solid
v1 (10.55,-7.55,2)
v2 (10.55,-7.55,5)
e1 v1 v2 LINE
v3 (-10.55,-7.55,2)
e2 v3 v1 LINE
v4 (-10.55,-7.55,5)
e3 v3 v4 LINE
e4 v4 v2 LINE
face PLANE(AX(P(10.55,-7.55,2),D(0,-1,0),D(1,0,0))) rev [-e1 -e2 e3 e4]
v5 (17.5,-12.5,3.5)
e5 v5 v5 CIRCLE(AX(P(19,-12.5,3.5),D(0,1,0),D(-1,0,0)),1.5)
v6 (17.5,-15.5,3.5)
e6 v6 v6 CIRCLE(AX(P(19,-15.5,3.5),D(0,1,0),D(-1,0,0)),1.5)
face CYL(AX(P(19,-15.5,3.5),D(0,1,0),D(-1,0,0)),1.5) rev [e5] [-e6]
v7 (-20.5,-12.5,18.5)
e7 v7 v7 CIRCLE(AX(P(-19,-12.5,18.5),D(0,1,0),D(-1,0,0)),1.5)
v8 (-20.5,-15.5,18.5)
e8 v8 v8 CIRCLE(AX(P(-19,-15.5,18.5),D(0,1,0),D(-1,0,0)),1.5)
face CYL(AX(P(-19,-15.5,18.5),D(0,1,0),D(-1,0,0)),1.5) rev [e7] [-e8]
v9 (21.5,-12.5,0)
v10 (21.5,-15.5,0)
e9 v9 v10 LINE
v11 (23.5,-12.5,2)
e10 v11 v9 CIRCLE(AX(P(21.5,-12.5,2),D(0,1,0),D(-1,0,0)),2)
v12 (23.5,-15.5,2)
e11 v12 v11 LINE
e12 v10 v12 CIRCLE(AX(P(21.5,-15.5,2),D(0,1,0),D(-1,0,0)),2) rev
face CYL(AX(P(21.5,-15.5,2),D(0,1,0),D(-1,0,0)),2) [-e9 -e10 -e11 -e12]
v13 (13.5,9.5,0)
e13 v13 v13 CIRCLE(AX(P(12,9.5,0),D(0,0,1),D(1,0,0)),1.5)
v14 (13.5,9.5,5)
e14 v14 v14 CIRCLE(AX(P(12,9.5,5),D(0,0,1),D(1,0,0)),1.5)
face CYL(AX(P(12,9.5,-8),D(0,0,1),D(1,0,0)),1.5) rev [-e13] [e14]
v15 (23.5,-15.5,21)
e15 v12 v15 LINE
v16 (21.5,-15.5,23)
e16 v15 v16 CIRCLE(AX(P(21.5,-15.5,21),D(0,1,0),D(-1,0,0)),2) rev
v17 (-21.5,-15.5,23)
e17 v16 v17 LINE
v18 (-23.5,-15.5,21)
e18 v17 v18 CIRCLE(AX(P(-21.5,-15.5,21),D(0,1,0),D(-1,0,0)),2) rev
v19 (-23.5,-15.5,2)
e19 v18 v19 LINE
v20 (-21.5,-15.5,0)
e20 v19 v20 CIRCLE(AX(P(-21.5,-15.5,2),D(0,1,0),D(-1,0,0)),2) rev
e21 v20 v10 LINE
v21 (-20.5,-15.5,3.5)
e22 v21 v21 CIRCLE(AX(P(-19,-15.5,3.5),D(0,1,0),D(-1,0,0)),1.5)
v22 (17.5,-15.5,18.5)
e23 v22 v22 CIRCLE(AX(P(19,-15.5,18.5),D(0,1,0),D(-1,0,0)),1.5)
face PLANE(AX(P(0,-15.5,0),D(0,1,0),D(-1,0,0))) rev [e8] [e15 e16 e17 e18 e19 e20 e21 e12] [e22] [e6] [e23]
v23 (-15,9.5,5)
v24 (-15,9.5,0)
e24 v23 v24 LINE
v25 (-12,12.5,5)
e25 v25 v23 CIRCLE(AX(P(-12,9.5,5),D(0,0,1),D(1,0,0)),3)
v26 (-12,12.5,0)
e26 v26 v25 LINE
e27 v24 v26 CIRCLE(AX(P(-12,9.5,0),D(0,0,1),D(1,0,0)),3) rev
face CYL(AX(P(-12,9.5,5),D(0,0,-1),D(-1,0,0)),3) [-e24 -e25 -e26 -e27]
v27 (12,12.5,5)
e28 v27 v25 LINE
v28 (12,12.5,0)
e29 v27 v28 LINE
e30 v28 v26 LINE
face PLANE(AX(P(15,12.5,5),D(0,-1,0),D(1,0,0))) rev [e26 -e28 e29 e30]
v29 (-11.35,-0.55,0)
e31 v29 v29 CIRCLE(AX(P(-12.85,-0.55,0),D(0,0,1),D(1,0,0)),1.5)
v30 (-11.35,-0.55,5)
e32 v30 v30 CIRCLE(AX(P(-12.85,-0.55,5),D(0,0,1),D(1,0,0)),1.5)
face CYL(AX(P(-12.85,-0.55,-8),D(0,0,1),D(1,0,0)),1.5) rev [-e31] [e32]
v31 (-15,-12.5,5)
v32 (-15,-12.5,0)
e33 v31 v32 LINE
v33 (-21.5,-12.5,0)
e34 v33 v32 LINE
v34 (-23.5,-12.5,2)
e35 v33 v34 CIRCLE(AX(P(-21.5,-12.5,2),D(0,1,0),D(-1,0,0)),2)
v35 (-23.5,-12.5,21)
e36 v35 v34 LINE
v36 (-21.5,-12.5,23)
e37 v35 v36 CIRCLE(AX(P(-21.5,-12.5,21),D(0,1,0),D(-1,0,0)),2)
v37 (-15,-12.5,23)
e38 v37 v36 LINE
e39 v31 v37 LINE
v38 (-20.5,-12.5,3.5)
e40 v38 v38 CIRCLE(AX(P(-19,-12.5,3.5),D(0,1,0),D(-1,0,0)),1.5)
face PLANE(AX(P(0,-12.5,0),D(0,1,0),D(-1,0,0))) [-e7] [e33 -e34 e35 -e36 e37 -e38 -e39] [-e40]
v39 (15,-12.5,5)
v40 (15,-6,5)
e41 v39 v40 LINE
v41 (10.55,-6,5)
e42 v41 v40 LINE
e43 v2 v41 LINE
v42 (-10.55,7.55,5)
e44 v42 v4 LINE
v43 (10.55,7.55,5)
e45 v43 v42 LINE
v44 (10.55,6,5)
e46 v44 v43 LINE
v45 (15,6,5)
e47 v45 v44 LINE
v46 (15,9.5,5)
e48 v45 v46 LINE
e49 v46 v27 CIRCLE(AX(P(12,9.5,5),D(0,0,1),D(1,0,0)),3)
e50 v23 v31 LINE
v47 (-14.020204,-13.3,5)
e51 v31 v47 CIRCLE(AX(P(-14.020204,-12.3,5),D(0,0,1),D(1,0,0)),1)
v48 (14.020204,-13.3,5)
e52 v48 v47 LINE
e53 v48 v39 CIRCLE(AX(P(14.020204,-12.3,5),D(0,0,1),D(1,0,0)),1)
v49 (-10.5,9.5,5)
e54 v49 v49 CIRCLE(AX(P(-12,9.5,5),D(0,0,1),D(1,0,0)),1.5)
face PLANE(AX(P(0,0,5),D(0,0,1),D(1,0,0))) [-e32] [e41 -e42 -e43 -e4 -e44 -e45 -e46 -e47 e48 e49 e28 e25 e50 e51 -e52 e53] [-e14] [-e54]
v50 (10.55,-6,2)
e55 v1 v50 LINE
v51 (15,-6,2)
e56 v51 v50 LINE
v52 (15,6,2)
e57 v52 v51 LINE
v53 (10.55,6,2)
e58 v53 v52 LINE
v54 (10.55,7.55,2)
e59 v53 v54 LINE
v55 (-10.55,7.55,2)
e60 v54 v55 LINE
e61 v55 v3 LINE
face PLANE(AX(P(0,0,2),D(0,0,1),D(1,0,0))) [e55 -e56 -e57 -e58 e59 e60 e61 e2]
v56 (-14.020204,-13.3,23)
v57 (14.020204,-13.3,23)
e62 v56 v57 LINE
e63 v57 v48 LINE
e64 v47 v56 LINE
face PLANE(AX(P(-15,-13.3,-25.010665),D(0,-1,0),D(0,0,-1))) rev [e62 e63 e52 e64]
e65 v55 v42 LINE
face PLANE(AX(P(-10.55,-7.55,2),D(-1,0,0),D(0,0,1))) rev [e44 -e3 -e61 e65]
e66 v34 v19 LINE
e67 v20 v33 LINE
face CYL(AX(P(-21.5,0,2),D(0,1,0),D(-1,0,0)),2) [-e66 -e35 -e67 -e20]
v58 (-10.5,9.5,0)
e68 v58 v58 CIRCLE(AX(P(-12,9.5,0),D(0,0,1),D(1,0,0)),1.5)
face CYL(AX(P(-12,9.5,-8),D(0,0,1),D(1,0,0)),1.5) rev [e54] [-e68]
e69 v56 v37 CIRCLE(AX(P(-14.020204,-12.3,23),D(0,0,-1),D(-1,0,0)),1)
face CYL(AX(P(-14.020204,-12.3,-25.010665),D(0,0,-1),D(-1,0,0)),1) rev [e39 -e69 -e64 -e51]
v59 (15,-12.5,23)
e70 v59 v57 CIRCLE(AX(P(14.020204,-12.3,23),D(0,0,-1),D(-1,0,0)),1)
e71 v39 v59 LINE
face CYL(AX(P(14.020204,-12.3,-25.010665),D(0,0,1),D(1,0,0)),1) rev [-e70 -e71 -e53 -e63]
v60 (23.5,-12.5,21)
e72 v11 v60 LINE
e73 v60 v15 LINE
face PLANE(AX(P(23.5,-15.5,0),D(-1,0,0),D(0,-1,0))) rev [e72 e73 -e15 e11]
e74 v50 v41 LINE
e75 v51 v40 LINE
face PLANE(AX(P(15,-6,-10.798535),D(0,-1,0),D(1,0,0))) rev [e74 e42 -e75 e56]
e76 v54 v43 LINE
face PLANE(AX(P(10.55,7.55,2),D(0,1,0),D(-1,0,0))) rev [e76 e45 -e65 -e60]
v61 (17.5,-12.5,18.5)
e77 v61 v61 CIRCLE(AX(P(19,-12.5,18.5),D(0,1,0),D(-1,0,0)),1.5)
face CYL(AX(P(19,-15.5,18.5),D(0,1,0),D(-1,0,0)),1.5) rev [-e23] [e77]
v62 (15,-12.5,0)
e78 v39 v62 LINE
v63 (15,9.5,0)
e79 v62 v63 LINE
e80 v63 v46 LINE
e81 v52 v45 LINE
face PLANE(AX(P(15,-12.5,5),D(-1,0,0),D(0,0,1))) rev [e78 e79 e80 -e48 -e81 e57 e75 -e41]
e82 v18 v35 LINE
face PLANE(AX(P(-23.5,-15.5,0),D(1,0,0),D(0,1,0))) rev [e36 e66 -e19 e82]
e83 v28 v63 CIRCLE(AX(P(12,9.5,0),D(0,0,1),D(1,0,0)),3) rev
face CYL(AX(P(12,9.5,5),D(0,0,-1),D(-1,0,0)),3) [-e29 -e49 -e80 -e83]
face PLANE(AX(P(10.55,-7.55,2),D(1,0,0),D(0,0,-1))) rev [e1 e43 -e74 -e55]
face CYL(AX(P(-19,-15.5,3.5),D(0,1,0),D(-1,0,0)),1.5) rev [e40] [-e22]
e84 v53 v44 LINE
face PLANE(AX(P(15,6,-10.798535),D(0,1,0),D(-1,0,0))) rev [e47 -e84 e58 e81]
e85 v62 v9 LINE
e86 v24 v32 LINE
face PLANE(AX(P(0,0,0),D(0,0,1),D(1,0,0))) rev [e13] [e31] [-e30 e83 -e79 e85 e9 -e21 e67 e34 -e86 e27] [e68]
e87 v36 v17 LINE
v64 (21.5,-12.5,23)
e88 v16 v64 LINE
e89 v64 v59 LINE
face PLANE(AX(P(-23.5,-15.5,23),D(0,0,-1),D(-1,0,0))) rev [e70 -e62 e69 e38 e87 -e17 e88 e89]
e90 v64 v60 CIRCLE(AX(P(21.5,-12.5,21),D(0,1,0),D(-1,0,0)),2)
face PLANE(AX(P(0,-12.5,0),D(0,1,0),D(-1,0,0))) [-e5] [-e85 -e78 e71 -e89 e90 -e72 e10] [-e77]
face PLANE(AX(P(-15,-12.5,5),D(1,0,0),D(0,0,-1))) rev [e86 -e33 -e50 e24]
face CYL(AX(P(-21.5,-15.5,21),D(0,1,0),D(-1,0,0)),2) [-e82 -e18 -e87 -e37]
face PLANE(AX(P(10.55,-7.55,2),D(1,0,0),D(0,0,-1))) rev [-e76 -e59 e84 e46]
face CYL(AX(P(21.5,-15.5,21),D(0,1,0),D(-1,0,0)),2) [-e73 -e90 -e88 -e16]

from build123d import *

# Parameters (mm, degrees)
SKETCH_1_W          = 30
SKETCH_1_H          = 25
EXTRUDE_1_DEPTH     = 5
SKETCH_2_W          = 21.1
SKETCH_2_H          = 15.1
CUT_EXTRUDE_1_DEPTH = 3
SKETCH_3_W          = 4.45
SKETCH_3_H          = 12
CUT_EXTRUDE_2_DEPTH = 3
FILLET_3_R          = 3
SKETCH_8_R          = 1.5
CUT_EXTRUDE_6_DEPTH = 10
SKETCH_9_W          = 47
SKETCH_9_H          = 23
EXTRUDE_2_DEPTH     = 3
SKETCH_10_R         = 1.5
CUT_EXTRUDE_7_DEPTH = 42.306779105
FILLET_4_R          = 2
SKETCH_11_W         = 30
SKETCH_11_H         = 0.8
CUT_EXTRUDE_8_DEPTH = 18
FILLET_5_R          = 1


with BuildPart() as part:
    # 草图1 → 凸台-拉伸1 (new body)
    with BuildSketch(Plane.XY):
        Rectangle(SKETCH_1_W, SKETCH_1_H)
    extrude(amount=EXTRUDE_1_DEPTH)

    # 草图2 → 切除-拉伸1 (cut)
    with BuildSketch(Plane.XY.offset(5)):
        Rectangle(SKETCH_2_W, SKETCH_2_H)
    extrude(amount=-CUT_EXTRUDE_1_DEPTH, mode=Mode.SUBTRACT)

    # 草图3 → 切除-拉伸2 (cut)
    with BuildSketch(Plane.XY.offset(5)):
        with Locations((12.775, 0)):
            Rectangle(SKETCH_3_W, SKETCH_3_H)
    extrude(amount=-CUT_EXTRUDE_2_DEPTH, mode=Mode.SUBTRACT)

    # 圆角3
    fillet_3_edges = [part.edges().sort_by_distance(p)[0] for p in [
        (-15, 12.5, 2.5),
        (15, 12.5, 2.5),
    ]]
    fillet(fillet_3_edges, radius=FILLET_3_R)

    # 草图8 → 切除-拉伸6 (cut, symmetric)
    with BuildSketch(Plane.XY.offset(2)):
        with Locations((12, 9.5)):
            Circle(SKETCH_8_R)
        with Locations((-12, 9.5)):
            Circle(SKETCH_8_R)
        with Locations((-12.85, -0.55)):
            Circle(SKETCH_8_R)
    extrude(amount=CUT_EXTRUDE_6_DEPTH, both=True, mode=Mode.SUBTRACT)

    # 草图9 → 凸台-拉伸2 (add)
    with BuildSketch(Plane.XZ.offset(12.5)):
        with Locations((0, 11.5)):
            Rectangle(SKETCH_9_W, SKETCH_9_H)
    extrude(amount=EXTRUDE_2_DEPTH)

    # 草图10 → 切除-拉伸7 (cut, through all)
    with BuildSketch(Plane(origin=(0, -12.5, 0), x_dir=(1, 0, 0), z_dir=(0, 1, 0))):
        with Locations(Location((-19, -3.5, 0), (0, 0, 180))):
            Circle(SKETCH_10_R)
        with Locations(Location((19, -3.5, 0), (0, 0, 180))):
            Circle(SKETCH_10_R)
        with Locations(Location((-19, -18.5, 0), (0, 0, 180))):
            Circle(SKETCH_10_R)
        with Locations(Location((19, -18.5, 0), (0, 0, 180))):
            Circle(SKETCH_10_R)
    extrude(amount=-CUT_EXTRUDE_7_DEPTH, mode=Mode.SUBTRACT)

    # 圆角4
    fillet_4_edges = [part.edges().sort_by_distance(p)[0] for p in [
        (-23.5, -14, 23),
        (-23.5, -14, 0),
        (23.5, -14, 0),
        (23.5, -14, 23),
    ]]
    fillet(fillet_4_edges, radius=FILLET_4_R)

    # 草图11 → 切除-拉伸8 (cut)
    with BuildSketch(Plane.XY.offset(23)):
        with Locations((0, -12.9)):
            Rectangle(SKETCH_11_W, SKETCH_11_H)
    extrude(amount=-CUT_EXTRUDE_8_DEPTH, mode=Mode.SUBTRACT)

    # 圆角5
    # the kernel refuses this fillet: 1 mm, written as the material it adds along each edge
    with BuildSketch(Plane(origin=(15, -13.3, 23), x_dir=(-1.569855356819468e-12, 1.0, 0), z_dir=(0, 0, -1))) as fillet_5_piece_1:
        with BuildLine():
            CenterArc((1, -0.979795897), FILLET_5_R, 101.536959033, 78.463040967)
            Line((0, -0.979795897), (-0.02, -0.979795897))
            Line((-0.02, -0.979795897), (-0.02, 0))
            Line((-0.02, 0), (0, 0.02))
            ThreePointArc((0, 0.02), (0.4, 0.02), (0.796, 0.019595918))
            Line((0.796, 0.019595918), (0.8, 0))
        make_face()
    extrude(amount=20.449489743)
    with BuildSketch(Plane(origin=(-15, -13.3, 23), x_dir=(1.5720758028687176e-12, 1.0, 0), z_dir=(0, 0, -1))) as fillet_5_piece_2:
        with BuildLine():
            CenterArc((1, 0.979795897), FILLET_5_R, 180, 78.463040967)
            Line((0, 0.979795897), (-0.02, 0.979795897))
            Line((-0.02, 0.979795897), (-0.02, 0))
            Line((-0.02, 0), (0, -0.02))
            ThreePointArc((0, -0.02), (0.4, -0.02), (0.796, -0.019595918))
            Line((0.796, -0.019595918), (0.8, 0))
        make_face()
    extrude(amount=20.449489743)


solid = part.part
